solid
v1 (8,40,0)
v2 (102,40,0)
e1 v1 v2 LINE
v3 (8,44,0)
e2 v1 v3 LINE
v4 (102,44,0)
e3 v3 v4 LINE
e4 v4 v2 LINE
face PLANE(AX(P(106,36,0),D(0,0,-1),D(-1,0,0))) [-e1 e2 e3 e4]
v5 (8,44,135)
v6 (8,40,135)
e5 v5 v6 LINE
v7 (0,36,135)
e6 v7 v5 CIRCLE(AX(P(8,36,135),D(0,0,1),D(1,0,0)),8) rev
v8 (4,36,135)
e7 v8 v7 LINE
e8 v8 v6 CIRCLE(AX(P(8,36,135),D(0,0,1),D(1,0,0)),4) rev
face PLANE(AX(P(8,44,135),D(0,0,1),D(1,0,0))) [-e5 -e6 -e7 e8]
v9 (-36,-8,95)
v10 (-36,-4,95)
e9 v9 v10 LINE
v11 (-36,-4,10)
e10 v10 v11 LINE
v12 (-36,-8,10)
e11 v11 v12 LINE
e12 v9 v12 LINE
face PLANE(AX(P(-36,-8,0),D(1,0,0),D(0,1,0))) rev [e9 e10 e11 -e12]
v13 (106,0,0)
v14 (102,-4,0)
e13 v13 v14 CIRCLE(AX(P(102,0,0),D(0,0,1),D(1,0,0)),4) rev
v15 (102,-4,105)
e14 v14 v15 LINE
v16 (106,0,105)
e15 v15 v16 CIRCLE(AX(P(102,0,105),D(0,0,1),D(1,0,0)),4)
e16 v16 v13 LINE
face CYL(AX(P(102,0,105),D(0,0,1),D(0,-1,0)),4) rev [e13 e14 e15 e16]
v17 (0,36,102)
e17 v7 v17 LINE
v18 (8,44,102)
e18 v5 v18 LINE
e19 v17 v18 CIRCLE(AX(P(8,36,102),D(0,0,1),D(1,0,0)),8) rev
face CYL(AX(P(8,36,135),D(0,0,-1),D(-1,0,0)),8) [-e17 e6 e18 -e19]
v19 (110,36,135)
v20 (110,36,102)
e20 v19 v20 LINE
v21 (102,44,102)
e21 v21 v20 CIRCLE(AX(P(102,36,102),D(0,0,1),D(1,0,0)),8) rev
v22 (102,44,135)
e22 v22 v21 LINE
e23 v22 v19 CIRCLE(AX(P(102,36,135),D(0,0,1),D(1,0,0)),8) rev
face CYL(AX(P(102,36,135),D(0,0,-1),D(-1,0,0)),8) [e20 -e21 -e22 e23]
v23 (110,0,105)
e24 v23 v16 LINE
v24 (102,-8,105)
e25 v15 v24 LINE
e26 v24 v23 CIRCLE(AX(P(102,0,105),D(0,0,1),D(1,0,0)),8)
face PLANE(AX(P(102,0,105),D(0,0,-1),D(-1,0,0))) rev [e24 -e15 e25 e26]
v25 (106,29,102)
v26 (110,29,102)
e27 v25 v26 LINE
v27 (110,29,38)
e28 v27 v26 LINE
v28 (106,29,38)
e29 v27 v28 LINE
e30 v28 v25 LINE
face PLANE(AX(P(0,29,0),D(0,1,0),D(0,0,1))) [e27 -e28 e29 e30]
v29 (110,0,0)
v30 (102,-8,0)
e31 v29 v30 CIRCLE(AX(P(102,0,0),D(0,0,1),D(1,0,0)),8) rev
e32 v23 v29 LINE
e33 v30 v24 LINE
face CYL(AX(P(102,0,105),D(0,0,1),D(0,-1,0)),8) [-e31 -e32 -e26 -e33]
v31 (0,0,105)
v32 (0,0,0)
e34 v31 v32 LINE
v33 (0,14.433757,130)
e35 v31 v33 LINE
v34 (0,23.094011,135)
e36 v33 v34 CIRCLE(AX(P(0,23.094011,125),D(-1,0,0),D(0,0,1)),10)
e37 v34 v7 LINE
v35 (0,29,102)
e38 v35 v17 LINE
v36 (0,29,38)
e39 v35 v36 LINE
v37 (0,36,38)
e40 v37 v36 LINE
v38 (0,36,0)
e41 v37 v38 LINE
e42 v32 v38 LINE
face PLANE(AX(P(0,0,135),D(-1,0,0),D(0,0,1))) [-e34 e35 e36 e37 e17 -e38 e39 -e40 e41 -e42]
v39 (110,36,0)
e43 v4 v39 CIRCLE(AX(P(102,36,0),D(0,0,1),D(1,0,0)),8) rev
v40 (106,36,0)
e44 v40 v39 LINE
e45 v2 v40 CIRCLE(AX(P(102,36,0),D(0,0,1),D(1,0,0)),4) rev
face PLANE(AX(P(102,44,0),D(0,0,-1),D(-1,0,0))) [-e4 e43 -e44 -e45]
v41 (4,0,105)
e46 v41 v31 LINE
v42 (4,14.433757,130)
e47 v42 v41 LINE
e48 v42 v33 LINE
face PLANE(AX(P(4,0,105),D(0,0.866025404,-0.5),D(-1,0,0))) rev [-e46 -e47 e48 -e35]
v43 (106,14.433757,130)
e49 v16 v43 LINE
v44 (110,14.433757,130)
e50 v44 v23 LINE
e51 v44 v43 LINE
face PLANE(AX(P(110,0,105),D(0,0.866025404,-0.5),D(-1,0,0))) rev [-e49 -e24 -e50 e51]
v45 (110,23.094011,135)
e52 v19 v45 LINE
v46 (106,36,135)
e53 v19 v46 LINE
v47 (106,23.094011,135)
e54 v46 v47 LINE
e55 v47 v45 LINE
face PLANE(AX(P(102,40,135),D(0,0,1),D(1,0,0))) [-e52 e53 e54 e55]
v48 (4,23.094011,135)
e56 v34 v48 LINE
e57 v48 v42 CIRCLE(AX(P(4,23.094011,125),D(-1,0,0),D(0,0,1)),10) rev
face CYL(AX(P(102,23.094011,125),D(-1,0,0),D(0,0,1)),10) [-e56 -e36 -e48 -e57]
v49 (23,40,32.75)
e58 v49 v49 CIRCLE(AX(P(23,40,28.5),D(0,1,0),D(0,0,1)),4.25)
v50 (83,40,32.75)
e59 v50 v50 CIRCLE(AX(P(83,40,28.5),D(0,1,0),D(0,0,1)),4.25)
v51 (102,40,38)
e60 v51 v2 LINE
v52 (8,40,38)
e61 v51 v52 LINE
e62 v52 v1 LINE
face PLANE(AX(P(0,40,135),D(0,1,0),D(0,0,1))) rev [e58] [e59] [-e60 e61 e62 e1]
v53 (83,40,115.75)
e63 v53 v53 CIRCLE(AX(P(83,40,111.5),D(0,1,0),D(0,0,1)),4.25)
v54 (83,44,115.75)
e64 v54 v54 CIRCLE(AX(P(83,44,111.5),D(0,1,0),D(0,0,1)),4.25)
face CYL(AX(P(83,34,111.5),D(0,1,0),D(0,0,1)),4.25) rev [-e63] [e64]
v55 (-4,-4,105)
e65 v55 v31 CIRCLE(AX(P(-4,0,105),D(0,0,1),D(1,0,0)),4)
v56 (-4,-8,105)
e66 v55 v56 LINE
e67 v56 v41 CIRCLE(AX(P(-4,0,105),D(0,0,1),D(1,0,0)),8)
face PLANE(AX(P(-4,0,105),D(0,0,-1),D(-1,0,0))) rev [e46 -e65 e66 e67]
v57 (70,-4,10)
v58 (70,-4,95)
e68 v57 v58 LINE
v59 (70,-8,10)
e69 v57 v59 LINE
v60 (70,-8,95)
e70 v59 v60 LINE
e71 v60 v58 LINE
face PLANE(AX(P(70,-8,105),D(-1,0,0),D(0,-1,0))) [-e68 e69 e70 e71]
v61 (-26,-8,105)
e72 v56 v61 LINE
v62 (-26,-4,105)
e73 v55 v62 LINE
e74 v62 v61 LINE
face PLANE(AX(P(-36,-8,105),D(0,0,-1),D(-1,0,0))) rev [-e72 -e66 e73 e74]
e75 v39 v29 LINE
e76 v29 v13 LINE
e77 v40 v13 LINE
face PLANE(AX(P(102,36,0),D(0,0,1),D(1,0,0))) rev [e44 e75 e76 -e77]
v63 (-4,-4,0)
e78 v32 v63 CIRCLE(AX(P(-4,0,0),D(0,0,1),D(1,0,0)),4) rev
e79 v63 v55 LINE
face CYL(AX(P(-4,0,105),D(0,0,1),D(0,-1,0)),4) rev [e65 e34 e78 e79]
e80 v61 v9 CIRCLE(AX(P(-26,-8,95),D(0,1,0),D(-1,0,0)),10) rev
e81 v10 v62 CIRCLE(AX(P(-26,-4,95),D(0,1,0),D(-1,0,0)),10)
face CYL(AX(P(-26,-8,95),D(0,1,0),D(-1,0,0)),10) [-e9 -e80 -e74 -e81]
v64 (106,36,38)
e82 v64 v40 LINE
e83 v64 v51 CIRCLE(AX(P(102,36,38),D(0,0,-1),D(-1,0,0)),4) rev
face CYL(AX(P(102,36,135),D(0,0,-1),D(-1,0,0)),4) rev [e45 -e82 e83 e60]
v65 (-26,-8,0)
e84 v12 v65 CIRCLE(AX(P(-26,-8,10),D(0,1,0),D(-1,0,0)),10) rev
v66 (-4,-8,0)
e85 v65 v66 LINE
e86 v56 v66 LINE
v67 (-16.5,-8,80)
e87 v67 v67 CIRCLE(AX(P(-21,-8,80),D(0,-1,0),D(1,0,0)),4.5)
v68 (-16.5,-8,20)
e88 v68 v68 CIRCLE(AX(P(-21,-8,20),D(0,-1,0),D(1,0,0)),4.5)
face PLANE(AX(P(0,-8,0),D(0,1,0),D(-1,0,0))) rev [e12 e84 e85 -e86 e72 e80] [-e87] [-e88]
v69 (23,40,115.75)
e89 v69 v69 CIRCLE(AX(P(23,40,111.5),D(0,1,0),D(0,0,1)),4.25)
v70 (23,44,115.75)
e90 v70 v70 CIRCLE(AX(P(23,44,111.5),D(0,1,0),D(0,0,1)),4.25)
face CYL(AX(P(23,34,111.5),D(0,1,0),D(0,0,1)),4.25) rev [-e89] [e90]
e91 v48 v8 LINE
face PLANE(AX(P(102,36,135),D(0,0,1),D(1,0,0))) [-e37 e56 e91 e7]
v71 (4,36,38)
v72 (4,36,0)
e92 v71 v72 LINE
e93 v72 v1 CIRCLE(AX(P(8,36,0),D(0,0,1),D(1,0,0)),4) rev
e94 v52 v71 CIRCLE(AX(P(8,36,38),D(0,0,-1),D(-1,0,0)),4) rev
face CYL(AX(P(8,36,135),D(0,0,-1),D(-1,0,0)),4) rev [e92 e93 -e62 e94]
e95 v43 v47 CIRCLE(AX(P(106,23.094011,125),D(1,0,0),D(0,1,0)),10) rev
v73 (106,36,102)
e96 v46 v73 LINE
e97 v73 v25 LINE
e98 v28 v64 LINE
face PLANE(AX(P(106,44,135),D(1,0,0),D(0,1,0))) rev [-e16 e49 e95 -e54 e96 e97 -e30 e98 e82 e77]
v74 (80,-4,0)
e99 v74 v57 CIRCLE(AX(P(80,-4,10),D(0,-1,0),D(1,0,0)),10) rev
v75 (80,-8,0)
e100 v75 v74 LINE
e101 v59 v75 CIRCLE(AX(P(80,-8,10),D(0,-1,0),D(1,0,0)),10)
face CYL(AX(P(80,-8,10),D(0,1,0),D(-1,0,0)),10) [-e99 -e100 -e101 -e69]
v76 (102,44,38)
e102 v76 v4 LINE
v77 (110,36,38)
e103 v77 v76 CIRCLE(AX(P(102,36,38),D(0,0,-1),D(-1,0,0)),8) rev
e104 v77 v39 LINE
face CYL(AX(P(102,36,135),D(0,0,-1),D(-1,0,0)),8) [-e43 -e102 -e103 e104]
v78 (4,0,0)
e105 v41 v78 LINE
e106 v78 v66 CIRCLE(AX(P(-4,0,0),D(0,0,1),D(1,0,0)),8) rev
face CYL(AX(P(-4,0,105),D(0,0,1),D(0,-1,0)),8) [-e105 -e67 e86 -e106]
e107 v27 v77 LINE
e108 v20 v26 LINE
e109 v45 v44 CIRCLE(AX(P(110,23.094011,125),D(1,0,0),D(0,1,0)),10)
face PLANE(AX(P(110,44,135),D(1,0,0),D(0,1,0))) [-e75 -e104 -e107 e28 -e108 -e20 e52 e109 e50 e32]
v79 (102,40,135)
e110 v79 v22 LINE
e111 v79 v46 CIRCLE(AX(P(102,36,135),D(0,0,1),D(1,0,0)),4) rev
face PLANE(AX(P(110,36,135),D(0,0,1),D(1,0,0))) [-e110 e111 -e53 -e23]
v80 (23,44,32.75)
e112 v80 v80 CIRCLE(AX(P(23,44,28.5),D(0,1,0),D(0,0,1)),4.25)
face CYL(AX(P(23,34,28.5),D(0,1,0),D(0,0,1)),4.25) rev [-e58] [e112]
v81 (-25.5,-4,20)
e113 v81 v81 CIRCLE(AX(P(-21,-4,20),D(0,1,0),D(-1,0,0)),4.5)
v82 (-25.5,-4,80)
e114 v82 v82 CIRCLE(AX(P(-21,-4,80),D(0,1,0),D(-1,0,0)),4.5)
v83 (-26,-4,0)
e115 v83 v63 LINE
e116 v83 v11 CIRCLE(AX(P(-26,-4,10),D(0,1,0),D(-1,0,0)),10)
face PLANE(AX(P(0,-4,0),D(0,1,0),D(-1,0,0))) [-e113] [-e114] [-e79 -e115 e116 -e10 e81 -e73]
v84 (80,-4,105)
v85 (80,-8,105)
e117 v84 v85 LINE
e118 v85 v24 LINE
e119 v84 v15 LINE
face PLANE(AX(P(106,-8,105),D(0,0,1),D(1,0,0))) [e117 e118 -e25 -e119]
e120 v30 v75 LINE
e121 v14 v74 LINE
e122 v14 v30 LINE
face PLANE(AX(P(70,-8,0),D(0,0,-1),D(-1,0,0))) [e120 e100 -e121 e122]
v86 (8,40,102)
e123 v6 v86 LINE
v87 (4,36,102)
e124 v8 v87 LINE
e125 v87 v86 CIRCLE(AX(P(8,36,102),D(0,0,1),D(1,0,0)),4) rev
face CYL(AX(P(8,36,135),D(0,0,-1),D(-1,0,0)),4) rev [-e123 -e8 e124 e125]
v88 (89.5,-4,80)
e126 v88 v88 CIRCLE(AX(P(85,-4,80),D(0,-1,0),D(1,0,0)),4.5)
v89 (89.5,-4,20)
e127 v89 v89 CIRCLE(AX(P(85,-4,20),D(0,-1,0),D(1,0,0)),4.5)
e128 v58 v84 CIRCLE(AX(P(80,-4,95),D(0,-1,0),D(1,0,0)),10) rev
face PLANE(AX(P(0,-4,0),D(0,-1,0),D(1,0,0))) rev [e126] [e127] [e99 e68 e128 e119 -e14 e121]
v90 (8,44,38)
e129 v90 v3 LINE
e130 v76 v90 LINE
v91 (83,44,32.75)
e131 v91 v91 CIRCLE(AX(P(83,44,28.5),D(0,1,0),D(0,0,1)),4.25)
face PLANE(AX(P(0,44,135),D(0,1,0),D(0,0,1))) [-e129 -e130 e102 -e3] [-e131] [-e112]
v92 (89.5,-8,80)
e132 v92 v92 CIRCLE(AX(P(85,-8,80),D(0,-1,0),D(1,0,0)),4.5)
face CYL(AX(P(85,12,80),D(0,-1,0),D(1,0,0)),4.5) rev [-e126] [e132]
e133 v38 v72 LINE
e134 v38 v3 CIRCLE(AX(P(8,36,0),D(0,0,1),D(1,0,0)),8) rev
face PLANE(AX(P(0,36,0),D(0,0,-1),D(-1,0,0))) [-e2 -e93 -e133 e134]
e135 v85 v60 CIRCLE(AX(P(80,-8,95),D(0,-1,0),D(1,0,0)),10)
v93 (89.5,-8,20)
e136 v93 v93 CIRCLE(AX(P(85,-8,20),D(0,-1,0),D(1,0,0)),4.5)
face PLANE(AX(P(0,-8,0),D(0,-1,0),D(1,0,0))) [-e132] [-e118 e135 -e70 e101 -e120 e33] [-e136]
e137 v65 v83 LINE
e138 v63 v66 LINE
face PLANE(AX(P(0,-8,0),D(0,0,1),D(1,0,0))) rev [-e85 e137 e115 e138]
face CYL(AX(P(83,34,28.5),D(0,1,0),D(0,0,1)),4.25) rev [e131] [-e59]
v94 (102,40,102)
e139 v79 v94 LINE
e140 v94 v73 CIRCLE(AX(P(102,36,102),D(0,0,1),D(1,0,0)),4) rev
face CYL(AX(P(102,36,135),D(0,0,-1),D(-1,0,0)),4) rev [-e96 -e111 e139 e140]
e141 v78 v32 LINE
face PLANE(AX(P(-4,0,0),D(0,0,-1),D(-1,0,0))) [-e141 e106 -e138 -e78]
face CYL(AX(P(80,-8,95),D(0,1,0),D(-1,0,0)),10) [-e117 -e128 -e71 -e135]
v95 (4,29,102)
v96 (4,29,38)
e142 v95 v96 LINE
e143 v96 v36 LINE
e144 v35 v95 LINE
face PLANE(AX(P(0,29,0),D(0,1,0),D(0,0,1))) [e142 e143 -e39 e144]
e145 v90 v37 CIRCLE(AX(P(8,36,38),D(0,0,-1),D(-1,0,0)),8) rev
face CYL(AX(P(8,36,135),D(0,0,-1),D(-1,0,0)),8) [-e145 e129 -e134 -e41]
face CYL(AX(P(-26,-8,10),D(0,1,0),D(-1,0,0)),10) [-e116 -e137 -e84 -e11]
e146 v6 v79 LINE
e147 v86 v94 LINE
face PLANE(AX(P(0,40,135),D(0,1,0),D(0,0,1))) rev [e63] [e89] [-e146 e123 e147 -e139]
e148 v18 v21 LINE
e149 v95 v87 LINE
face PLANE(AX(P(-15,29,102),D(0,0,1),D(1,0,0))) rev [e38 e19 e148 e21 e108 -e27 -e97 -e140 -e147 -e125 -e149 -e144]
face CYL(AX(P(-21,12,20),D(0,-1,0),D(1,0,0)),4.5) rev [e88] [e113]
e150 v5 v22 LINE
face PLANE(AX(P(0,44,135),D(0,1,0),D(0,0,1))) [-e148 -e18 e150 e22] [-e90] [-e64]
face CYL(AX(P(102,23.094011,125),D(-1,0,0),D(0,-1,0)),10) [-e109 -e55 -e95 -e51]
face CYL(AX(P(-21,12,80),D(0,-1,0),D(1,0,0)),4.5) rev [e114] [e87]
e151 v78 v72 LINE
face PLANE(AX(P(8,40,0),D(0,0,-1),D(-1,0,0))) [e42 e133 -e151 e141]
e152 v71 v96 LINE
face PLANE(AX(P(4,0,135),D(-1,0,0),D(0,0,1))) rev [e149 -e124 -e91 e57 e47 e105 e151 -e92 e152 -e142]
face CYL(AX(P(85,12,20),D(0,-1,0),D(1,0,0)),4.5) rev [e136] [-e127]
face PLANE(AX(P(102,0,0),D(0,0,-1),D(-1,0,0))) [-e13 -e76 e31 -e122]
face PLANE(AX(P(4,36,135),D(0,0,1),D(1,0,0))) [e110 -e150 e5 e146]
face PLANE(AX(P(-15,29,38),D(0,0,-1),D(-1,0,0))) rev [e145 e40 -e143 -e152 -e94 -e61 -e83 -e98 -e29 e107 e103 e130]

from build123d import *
from OCP.BRepFilletAPI import BRepFilletAPI_MakeChamfer

# Parameters (mm, degrees)
TABAN_FLAN_1_DEPTH      = 135
IZIM10_R                = 4.25
KES_EKSTR_ZYON1_DEPTH   = 10
IZIM11_W                = 140
IZIM11_H                = 64
KES_EKSTR_ZYON2_DEPTH   = 15
PAH1_SIZE               = 30
PAH1_SIZE2              = 17.320508076
KENAR_FLAN_1_DEPTH      = 105
KENAR_FLAN_1_BEND_DEPTH = 105
RADYUS1_R               = 10
IZIM18_R                = 4.5
KES_EKSTR_ZYON3_DEPTH   = 20
RADYUS2_R               = 10


# Sheet-metal steps are written as plain solids
with BuildPart() as part:
    # Çizim1 → Taban-Flanş1 (new body)
    with BuildSketch(Plane.XY):
        with BuildLine():
            Line((0, 0), (0, 36))
            ThreePointArc((0, 36), (2.343145751, 41.656854249), (8, 44))
            Line((8, 44), (102, 44))
            ThreePointArc((102, 44), (107.656854249, 41.656854249), (110, 36))
            Line((110, 36), (110, 0))
            Line((110, 0), (106, 0))
            Line((106, 0), (106, 36))
            ThreePointArc((106, 36), (104.828427125, 38.828427125), (102, 40))
            Line((102, 40), (8, 40))
            ThreePointArc((8, 40), (5.171572875, 38.828427125), (4, 36))
            Line((4, 36), (4, 0))
            Line((4, 0), (0, 0))
        make_face()
    extrude(amount=TABAN_FLAN_1_DEPTH)

    # Çizim10 → Kes-Ekstrüzyon1 (cut)
    with BuildSketch(Plane(origin=(0, 44, 0), x_dir=(1, 0, 0), z_dir=(0, 1, 0))):
        with Locations(Location((23, -111.5, 0), (0, 0, 270))):
            Circle(IZIM10_R)
        with Locations(Location((83, -111.5, 0), (0, 0, 270))):
            Circle(IZIM10_R)
        with Locations(Location((83, -28.5, 0), (0, 0, 270))):
            Circle(IZIM10_R)
        with Locations(Location((23, -28.5, 0), (0, 0, 270))):
            Circle(IZIM10_R)
    extrude(amount=-KES_EKSTR_ZYON1_DEPTH, mode=Mode.SUBTRACT)

    # Çizim11 → Kes-Ekstrüzyon2 (cut)
    with BuildSketch(Plane(origin=(0, 44, 0), x_dir=(1, 0, 0), z_dir=(0, 1, 0))):
        with Locations((55, -70)):
            Rectangle(IZIM11_W, IZIM11_H)
    extrude(amount=-KES_EKSTR_ZYON2_DEPTH, mode=Mode.SUBTRACT)

    # Pah1: one chamfer whose edges measure the first distance from different faces: ONE call of the kernel's chamfer builder (chamfer() names one face for all edges)
    pah1_edges_1 = [part.edges().sort_by_distance(p)[0] for p in [
        (2, 0, 135),
    ]]
    pah1_side_1 = [part.faces().sort_by_distance(p)[0] for p in [
        (2, 0, 67.5),
    ]]
    pah1_edges_2 = [part.edges().sort_by_distance(p)[0] for p in [
        (108, 0, 135),
    ]]
    pah1_side_2 = [part.faces().sort_by_distance(p)[0] for p in [
        (108, 0, 67.5),
    ]]
    pah1 = BRepFilletAPI_MakeChamfer(part.part.solid().wrapped)
    for e in pah1_edges_1:
        pah1.Add(PAH1_SIZE, PAH1_SIZE2, e.wrapped, pah1_side_1[0].wrapped)  # the first distance lies on this face
    for e in pah1_edges_2:
        pah1.Add(PAH1_SIZE, PAH1_SIZE2, e.wrapped, pah1_side_2[0].wrapped)  # the first distance lies on this face
    add(Compound.cast(pah1.Shape()), mode=Mode.REPLACE)

    # Kenar-Flanş1 section (across the edge) → Kenar-Flanş1 (add)
    with BuildSketch(Plane(origin=(0, -4, 0), x_dir=(0, 1, 0), z_dir=(0, 0, 1))):
        with BuildLine():
            Line((-4, 4), (-4, 36))
            Line((-4, 36), (0, 36))
            Line((0, 36), (0, 4))
            ThreePointArc((0, 4), (1.171572875, 1.171572875), (4, 0))
            Line((4, 0), (4, -4))
            ThreePointArc((4, -4), (-1.656854249, -1.656854249), (-4, 4))
        make_face()
    extrude(amount=KENAR_FLAN_1_DEPTH)

    # Kenar-Flanş1 section 2 (across the edge) → Kenar-Flanş1 bend (add)
    with BuildSketch(Plane(origin=(106, -4, 0), x_dir=(0, 1, 0), z_dir=(0, 0, 1))):
        with BuildLine():
            Line((-4, 4), (-4, 36))
            Line((-4, 36), (0, 36))
            Line((0, 36), (0, 4))
            ThreePointArc((0, 4), (1.171572875, 1.171572875), (4, 0))
            Line((4, 0), (4, -4))
            ThreePointArc((4, -4), (-1.656854249, -1.656854249), (-4, 4))
        make_face()
    extrude(amount=KENAR_FLAN_1_BEND_DEPTH)

    # Radyus1
    radyus1_edges = [part.edges().sort_by_distance(p)[0] for p in [
        (-36, -6, 0),
        (-36, -6, 105),
        (70, -6, 0),
        (70, -6, 105),
    ]]
    fillet(radyus1_edges, radius=RADYUS1_R)

    # Çizim18 → Kes-Ekstrüzyon3 (cut)
    with BuildSketch(Plane.XZ.offset(8)):
        with Locations((85, 80)):
            Circle(IZIM18_R)
        with Locations((85, 20)):
            Circle(IZIM18_R)
        with Locations((-21, 80)):
            Circle(IZIM18_R)
        with Locations((-21, 20)):
            Circle(IZIM18_R)
    extrude(amount=-KES_EKSTR_ZYON3_DEPTH, mode=Mode.SUBTRACT)

    # Radyus2
    radyus2_edges = [part.edges().sort_by_distance(p)[0] for p in [
        (108, 17.320508076, 135),
        (2, 17.320508076, 135),
    ]]
    fillet(radyus2_edges, radius=RADYUS2_R)


solid = part.part
